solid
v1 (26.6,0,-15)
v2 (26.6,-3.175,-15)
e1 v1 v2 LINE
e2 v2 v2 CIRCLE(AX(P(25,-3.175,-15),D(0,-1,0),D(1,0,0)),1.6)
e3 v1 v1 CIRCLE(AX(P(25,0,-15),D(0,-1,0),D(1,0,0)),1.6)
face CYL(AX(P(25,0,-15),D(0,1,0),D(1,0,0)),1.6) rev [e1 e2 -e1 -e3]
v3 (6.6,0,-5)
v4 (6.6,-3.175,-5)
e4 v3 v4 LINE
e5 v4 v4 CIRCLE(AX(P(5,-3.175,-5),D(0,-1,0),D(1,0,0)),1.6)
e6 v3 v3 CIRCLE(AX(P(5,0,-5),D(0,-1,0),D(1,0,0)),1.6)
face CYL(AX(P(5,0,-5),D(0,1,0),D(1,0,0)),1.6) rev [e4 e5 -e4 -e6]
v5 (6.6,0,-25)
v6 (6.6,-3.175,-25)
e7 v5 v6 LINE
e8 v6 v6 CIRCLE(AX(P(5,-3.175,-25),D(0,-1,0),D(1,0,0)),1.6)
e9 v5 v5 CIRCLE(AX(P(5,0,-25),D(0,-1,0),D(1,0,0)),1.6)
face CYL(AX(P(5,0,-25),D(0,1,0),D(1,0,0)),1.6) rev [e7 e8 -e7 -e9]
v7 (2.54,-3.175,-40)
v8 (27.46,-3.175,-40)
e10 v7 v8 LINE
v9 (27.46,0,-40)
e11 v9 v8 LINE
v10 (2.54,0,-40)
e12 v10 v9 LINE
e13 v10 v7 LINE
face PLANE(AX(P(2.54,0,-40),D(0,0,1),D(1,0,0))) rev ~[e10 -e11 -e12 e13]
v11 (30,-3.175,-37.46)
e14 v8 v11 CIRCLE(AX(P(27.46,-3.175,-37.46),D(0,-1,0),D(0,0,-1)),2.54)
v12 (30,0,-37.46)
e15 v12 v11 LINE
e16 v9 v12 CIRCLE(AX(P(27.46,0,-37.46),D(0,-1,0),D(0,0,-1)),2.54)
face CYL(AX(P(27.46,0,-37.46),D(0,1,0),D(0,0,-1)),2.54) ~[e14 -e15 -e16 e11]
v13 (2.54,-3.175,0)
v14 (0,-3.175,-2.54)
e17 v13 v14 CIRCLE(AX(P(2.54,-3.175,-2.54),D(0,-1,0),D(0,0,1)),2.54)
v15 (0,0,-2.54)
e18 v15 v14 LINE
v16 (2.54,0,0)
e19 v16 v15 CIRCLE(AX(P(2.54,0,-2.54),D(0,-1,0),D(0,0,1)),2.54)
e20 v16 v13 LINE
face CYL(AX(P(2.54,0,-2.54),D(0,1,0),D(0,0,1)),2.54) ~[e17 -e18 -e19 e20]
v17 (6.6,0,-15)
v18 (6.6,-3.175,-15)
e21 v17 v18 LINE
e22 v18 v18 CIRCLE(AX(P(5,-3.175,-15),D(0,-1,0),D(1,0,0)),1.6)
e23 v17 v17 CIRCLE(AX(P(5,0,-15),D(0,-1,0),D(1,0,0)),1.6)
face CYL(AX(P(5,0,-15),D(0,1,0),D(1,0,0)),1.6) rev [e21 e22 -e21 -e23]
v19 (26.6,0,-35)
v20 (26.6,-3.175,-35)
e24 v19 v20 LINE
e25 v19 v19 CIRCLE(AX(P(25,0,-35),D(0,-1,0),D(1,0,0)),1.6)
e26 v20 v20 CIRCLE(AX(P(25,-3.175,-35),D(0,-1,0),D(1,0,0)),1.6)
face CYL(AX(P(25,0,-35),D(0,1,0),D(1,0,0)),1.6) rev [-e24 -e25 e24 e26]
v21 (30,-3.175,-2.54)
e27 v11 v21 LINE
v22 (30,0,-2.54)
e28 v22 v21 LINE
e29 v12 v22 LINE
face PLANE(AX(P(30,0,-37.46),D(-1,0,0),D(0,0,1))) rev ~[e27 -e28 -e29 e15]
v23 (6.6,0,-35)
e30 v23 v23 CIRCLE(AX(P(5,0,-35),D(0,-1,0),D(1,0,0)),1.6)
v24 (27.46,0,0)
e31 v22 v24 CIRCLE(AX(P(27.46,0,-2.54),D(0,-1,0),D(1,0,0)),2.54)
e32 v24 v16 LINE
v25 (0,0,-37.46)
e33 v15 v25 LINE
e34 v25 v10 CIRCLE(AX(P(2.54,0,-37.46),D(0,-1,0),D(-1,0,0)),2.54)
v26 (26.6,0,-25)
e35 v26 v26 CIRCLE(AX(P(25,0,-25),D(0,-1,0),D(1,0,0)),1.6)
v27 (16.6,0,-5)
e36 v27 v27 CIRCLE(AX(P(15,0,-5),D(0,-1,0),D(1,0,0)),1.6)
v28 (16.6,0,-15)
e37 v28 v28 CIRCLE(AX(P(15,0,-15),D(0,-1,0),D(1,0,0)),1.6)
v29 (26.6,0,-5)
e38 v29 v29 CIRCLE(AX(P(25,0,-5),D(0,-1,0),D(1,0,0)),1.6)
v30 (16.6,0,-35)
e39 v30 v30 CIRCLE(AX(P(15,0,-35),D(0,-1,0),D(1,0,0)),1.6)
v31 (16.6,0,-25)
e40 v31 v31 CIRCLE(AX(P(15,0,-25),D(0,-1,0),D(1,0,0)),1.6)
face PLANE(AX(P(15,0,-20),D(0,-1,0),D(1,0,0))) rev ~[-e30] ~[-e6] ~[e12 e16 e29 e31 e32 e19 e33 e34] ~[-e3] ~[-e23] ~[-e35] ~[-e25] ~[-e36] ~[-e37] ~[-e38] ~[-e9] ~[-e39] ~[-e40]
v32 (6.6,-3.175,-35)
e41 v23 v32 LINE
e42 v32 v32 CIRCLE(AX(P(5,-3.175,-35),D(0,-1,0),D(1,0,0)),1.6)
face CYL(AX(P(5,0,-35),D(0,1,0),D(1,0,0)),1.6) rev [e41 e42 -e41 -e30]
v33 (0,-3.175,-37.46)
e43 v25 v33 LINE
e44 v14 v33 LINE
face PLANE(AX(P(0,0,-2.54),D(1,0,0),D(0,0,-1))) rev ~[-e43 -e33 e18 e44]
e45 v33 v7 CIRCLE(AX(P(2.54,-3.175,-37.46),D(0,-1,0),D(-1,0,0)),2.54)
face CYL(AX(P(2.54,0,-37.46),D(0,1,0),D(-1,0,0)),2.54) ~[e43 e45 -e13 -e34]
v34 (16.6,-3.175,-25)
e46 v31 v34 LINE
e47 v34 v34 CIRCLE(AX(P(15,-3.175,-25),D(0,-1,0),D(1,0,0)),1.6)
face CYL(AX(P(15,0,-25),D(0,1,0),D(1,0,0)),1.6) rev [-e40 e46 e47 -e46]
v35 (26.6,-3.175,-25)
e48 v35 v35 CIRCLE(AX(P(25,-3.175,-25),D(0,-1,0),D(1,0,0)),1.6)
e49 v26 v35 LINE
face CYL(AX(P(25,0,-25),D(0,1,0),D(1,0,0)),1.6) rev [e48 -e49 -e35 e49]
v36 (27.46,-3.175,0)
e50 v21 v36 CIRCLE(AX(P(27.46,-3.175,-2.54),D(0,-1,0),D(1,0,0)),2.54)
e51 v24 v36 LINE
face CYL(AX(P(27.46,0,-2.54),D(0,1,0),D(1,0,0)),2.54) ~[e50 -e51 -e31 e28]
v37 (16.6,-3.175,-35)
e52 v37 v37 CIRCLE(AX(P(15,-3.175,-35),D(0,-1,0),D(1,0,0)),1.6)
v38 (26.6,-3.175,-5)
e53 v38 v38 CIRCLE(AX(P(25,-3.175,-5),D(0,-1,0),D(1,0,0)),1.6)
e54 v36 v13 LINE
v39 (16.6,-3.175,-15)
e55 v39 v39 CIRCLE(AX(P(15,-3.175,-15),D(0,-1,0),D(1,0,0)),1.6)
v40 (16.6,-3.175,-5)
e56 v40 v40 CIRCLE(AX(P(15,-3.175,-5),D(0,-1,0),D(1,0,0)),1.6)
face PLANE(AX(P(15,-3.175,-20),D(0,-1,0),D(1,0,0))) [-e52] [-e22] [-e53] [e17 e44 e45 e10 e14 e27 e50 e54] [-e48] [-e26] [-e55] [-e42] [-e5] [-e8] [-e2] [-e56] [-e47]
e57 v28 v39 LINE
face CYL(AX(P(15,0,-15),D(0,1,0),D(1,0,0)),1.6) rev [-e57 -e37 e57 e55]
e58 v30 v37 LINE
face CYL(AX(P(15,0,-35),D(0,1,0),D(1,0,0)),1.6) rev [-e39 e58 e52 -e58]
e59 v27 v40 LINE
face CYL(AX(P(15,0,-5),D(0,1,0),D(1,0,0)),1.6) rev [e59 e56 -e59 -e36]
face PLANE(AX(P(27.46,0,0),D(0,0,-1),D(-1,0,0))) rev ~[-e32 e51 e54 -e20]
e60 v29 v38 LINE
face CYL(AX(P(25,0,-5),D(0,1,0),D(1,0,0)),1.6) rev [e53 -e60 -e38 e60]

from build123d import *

# Parameters (mm, degrees)
F0_R     = 1.6
F1_DEPTH = 3.175


# Not quite as in the source:
# - a length typed as a fraction of an inch, garbled in the dataset ("3 / 203.2 mm" for 3/8 in), is restored


with BuildPart() as f1:
    # F0 (on Front) → F1 (new body)
    with BuildSketch(Plane.XZ):
        with BuildLine():
            Line((27.46, 0), (2.54, 0))
            ThreePointArc((2.54, 0), (0.7439487758, -0.7439487758), (0, -2.54))
            Line((0, -2.54), (0, -37.46))
            ThreePointArc((0, -37.46), (0.7439487758, -39.2560512242), (2.54, -40))
            Line((2.54, -40), (27.46, -40))
            ThreePointArc((27.46, -40), (29.2560512242, -39.2560512242), (30, -37.46))
            Line((30, -37.46), (30, -2.54))
            ThreePointArc((30, -2.54), (29.2560512242, -0.7439487758), (27.46, 0))
        make_face()
        with Locations((5, -35)):
            Circle(F0_R, mode=Mode.SUBTRACT)
        with Locations((5, -25)):
            Circle(F0_R, mode=Mode.SUBTRACT)
        with Locations((15, -35)):
            Circle(F0_R, mode=Mode.SUBTRACT)
        with Locations((25, -35)):
            Circle(F0_R, mode=Mode.SUBTRACT)
        with Locations((15, -25)):
            Circle(F0_R, mode=Mode.SUBTRACT)
        with Locations((25, -25)):
            Circle(F0_R, mode=Mode.SUBTRACT)
        with Locations((5, -15)):
            Circle(F0_R, mode=Mode.SUBTRACT)
        with Locations((5, -5)):
            Circle(F0_R, mode=Mode.SUBTRACT)
        with Locations((15, -15)):
            Circle(F0_R, mode=Mode.SUBTRACT)
        with Locations((25, -15)):
            Circle(F0_R, mode=Mode.SUBTRACT)
        with Locations((15, -5)):
            Circle(F0_R, mode=Mode.SUBTRACT)
        with Locations((25, -5)):
            Circle(F0_R, mode=Mode.SUBTRACT)
    extrude(amount=F1_DEPTH)


solid = f1.part
